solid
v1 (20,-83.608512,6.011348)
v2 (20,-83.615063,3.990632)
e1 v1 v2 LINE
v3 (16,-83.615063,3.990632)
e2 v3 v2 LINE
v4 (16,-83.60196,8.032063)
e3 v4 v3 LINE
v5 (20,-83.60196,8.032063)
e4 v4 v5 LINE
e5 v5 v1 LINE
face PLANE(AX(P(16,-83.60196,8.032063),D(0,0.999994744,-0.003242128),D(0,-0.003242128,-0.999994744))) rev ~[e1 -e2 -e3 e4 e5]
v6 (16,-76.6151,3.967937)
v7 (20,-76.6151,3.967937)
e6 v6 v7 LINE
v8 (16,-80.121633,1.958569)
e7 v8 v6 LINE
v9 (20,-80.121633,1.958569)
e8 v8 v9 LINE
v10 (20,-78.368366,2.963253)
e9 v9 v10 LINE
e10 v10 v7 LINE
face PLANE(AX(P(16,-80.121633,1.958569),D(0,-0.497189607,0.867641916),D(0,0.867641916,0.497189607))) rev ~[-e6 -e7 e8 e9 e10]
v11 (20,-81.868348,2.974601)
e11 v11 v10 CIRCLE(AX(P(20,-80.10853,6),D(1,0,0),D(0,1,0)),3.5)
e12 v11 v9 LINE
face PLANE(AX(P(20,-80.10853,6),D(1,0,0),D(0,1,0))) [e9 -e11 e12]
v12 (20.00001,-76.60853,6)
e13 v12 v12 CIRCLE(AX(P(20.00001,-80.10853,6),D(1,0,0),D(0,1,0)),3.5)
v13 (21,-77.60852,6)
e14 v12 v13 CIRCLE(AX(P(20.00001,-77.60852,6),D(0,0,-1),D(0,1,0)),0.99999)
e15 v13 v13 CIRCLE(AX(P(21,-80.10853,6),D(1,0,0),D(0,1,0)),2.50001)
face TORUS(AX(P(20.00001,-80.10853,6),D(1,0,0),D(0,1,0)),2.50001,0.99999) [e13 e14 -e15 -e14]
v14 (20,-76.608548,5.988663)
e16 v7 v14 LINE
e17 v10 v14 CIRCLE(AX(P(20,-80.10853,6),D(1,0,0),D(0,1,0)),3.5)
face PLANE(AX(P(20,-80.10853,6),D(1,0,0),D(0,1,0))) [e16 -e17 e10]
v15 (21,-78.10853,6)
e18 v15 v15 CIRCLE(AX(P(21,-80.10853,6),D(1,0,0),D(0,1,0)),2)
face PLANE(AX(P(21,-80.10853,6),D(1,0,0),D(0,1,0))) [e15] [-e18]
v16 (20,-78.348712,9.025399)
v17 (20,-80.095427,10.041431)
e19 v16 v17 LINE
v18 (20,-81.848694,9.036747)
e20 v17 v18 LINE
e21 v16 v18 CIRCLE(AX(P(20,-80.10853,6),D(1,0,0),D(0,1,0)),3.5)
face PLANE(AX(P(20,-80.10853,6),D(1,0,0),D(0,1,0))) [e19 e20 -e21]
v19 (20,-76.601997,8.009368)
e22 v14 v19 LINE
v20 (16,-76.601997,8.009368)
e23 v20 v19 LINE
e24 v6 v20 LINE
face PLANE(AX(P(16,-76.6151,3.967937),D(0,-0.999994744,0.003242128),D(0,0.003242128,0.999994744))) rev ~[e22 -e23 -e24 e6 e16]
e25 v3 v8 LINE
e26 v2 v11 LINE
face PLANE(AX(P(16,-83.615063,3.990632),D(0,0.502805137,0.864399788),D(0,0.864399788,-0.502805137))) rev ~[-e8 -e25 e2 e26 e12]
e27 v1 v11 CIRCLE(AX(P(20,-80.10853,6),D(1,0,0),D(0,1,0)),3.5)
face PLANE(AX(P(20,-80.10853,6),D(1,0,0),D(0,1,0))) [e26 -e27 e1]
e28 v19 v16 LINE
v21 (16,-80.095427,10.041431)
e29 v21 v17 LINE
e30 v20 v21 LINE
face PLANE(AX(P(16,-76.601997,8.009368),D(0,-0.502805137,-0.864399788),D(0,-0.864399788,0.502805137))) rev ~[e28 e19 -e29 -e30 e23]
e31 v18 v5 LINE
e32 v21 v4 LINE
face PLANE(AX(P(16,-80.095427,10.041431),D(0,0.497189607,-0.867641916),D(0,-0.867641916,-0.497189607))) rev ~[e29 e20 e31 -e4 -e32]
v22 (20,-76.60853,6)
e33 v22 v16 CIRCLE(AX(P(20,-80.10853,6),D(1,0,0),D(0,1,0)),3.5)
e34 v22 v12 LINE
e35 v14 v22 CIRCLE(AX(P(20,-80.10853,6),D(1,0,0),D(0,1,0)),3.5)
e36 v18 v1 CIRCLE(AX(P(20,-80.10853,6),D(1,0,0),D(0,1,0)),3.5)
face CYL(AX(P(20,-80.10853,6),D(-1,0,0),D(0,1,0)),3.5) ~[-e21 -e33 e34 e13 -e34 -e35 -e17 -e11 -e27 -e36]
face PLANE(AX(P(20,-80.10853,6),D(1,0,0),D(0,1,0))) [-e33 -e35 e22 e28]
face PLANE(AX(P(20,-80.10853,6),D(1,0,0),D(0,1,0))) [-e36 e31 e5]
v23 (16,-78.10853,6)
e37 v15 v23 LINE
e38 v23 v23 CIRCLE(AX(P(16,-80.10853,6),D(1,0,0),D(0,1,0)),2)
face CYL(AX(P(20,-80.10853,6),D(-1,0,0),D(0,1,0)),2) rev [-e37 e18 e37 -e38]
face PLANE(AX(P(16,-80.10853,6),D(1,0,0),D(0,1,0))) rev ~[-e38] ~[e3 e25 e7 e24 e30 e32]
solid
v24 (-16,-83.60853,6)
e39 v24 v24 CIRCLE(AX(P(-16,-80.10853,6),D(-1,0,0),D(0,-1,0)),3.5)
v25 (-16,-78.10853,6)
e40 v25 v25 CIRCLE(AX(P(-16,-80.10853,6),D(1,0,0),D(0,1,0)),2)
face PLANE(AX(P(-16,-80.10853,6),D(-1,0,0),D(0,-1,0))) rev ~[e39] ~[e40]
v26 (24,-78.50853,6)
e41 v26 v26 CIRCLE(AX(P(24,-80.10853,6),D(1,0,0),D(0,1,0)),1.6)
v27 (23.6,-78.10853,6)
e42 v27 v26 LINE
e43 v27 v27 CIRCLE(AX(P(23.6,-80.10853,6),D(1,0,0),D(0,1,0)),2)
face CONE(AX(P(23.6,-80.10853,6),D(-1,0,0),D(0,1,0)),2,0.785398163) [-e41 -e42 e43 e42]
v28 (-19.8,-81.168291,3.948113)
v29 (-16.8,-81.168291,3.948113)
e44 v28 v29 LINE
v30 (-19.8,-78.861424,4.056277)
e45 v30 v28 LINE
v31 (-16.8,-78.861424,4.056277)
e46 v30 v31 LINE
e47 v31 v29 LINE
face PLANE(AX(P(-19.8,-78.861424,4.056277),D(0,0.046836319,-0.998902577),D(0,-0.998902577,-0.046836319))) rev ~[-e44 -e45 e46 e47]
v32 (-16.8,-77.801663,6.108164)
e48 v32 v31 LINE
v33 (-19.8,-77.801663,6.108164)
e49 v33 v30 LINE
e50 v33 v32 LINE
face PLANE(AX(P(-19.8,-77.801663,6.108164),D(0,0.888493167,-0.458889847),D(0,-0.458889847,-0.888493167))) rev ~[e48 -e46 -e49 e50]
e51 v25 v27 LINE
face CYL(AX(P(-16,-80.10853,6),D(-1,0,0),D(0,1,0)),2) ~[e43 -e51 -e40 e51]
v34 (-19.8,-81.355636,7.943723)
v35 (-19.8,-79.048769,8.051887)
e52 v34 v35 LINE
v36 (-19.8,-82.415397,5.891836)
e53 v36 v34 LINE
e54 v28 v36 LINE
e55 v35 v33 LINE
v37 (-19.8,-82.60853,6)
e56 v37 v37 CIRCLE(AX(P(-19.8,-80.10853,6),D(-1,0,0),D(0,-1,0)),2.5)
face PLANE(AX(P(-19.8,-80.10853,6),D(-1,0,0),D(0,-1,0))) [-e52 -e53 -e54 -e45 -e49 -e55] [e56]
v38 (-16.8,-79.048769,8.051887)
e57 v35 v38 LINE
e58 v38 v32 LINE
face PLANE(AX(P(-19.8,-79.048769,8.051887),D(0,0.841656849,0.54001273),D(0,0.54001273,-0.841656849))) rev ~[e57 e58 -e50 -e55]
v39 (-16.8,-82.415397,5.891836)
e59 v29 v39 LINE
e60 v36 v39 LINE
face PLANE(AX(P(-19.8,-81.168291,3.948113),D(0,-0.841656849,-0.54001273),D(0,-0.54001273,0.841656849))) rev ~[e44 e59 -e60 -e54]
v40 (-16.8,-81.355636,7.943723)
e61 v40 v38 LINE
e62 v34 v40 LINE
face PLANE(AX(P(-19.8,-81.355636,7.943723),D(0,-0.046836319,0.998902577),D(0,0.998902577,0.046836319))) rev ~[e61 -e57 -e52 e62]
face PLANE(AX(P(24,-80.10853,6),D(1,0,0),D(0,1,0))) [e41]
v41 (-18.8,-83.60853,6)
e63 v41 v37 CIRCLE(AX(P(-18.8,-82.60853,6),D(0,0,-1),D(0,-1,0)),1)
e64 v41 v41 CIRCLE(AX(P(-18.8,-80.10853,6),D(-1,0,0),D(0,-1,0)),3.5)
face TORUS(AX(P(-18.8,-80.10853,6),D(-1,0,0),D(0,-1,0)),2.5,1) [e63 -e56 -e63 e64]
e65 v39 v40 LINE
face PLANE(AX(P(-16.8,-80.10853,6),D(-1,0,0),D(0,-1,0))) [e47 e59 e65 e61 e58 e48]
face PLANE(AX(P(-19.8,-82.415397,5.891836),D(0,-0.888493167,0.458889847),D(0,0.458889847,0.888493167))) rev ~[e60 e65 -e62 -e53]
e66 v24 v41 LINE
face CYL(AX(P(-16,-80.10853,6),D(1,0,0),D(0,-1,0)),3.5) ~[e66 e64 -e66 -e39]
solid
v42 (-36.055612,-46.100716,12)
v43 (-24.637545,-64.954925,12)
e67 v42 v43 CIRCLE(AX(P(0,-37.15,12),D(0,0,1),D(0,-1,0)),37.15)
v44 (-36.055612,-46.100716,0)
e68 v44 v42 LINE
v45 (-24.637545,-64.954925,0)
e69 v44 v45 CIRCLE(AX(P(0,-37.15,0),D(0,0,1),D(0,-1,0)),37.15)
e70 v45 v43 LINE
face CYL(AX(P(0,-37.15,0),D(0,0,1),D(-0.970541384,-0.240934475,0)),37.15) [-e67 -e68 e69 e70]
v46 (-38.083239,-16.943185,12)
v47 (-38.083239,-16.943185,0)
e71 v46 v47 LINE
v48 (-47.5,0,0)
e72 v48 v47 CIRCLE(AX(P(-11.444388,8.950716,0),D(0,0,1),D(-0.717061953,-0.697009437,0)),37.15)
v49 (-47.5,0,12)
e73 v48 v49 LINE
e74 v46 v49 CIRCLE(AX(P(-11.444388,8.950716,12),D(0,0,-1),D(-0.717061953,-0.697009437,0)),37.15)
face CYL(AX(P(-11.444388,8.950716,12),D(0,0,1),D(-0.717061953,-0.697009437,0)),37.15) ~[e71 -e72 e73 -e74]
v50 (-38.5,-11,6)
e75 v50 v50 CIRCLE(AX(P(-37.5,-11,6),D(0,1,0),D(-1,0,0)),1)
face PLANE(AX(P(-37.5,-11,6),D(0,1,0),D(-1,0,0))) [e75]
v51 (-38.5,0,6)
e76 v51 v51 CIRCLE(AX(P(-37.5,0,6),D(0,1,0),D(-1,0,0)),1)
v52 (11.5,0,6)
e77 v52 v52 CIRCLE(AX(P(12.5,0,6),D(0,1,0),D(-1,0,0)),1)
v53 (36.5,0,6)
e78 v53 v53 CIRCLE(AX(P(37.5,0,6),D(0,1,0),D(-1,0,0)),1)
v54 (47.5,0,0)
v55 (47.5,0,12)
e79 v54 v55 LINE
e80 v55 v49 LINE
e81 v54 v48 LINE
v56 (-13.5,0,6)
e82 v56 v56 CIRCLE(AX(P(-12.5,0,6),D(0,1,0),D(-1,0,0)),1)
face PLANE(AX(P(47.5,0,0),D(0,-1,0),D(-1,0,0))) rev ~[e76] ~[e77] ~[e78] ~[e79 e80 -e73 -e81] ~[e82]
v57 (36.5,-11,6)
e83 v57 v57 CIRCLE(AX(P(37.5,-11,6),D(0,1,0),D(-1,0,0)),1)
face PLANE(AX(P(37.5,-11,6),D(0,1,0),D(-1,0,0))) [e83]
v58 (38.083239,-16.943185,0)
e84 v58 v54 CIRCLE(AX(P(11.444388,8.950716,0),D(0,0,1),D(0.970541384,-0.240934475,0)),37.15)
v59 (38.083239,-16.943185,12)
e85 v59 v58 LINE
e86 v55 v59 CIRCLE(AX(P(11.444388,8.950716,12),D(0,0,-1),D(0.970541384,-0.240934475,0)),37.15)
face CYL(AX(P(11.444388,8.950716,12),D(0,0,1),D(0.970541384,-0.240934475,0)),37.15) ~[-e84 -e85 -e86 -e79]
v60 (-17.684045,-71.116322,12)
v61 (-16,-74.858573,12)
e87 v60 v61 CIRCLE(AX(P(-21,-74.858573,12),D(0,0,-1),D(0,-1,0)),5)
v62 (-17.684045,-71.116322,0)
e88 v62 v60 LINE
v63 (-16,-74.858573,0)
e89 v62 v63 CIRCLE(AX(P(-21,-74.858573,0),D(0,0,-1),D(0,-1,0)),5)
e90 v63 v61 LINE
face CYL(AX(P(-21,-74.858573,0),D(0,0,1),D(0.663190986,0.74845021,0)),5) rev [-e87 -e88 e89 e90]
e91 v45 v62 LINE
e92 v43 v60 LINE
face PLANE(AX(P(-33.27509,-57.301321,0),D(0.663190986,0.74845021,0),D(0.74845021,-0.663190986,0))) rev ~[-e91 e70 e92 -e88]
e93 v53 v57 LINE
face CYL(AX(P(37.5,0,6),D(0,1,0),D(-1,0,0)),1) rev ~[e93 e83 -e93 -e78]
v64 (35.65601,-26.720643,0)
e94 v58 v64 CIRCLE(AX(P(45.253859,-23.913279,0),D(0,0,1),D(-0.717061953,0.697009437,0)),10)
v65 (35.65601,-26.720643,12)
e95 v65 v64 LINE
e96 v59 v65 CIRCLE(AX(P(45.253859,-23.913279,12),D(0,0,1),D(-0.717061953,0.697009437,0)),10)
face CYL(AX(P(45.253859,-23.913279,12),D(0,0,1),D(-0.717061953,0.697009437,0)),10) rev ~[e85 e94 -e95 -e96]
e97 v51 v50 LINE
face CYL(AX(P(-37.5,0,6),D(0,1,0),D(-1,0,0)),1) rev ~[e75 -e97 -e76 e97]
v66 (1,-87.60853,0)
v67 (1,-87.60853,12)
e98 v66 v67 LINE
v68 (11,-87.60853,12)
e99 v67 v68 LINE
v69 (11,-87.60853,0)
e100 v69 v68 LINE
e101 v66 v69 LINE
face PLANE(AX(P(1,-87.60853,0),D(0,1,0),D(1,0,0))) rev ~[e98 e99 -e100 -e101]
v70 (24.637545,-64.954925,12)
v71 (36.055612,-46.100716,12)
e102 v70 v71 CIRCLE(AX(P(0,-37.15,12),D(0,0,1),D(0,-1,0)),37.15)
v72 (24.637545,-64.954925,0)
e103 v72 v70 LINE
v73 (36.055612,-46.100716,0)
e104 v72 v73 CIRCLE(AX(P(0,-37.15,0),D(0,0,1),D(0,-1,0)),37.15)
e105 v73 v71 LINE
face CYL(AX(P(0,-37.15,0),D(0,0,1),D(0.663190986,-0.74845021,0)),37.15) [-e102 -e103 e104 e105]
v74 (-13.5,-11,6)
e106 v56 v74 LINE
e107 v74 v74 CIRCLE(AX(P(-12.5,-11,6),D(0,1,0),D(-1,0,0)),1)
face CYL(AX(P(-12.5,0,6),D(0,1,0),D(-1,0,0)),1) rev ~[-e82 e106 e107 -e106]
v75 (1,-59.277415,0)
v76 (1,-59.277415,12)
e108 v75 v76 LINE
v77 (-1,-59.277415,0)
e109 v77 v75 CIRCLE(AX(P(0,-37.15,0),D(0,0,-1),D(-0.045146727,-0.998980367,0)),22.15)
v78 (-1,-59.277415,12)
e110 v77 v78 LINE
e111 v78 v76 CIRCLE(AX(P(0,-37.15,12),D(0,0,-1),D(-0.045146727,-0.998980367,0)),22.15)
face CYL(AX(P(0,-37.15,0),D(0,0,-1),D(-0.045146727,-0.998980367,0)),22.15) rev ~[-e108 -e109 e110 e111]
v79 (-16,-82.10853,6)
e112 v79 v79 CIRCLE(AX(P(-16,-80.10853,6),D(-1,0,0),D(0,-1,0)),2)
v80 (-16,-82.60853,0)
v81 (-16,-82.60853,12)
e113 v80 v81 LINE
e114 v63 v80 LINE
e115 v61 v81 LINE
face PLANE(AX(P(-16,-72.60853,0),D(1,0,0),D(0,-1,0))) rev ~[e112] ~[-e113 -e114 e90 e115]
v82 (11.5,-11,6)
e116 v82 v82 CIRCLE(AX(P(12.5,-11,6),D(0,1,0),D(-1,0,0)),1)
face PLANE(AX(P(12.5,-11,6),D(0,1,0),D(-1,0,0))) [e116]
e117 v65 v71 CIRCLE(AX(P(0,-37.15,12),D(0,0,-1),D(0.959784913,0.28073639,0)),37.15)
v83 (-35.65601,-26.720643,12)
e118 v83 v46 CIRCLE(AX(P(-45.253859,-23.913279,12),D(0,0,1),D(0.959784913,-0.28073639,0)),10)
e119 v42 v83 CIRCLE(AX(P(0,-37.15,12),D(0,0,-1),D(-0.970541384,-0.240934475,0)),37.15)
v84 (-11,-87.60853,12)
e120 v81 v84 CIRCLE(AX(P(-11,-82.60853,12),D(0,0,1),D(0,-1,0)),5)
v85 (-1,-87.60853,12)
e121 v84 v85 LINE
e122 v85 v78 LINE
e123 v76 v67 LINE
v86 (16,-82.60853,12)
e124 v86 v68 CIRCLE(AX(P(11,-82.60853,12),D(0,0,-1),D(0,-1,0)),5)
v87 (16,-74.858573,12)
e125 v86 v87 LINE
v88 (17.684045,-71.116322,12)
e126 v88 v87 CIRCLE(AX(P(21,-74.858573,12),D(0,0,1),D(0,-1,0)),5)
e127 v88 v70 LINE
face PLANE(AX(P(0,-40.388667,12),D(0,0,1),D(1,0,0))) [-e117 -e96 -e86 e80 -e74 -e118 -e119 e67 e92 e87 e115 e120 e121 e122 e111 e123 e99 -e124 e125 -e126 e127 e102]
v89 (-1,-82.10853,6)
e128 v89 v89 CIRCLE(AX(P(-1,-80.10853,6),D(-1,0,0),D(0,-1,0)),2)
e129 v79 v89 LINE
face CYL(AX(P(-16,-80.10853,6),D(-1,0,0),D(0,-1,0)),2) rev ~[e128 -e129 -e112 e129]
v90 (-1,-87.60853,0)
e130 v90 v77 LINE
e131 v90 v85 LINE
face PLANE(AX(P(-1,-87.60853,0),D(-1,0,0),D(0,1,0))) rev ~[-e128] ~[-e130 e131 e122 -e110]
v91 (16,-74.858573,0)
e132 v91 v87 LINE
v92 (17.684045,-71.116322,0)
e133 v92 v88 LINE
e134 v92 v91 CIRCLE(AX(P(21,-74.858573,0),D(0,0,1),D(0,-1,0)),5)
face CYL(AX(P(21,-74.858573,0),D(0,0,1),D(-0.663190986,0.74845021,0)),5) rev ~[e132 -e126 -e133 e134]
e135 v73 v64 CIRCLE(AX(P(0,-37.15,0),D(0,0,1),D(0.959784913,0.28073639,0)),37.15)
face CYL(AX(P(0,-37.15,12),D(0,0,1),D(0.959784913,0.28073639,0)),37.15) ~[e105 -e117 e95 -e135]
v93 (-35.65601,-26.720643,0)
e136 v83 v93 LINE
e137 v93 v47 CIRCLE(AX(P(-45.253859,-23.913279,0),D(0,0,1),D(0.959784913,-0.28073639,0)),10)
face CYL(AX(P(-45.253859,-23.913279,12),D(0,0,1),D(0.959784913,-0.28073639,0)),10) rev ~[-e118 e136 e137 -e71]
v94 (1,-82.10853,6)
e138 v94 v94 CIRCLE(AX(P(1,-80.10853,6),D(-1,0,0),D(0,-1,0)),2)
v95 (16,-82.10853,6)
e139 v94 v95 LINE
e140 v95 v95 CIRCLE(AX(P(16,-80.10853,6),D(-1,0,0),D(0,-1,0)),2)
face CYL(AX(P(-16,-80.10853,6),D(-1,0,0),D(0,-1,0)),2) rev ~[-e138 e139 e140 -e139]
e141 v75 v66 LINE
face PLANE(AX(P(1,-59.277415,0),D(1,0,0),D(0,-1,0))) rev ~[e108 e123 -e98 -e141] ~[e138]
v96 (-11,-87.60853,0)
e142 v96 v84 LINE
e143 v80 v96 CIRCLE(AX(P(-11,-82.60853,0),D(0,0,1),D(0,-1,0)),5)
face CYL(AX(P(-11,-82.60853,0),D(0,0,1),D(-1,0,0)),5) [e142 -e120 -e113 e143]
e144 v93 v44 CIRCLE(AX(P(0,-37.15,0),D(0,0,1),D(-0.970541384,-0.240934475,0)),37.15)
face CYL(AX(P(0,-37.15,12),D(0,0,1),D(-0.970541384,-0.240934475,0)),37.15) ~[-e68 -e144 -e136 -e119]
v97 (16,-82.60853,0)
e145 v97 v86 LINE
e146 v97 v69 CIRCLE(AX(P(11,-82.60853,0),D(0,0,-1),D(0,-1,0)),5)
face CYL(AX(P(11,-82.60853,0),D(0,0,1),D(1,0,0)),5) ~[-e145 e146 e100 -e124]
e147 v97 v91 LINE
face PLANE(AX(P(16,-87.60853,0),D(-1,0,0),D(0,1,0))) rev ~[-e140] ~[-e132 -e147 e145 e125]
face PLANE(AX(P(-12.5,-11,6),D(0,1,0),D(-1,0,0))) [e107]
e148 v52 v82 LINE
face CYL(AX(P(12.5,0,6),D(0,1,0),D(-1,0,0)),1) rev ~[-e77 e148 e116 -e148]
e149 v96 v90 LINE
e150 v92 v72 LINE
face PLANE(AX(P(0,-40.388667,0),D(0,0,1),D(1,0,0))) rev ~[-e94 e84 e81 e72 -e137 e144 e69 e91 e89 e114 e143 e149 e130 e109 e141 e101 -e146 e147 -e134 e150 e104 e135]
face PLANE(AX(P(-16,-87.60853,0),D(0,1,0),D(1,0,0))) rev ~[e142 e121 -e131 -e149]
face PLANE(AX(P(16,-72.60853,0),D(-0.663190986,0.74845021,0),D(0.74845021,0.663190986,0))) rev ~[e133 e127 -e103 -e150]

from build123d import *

# Parameters (mm, degrees)
F1_DEPTH  = 12
F2_R      = 37.15
F3_R      = 2
F4_DEPTH  = 63.501
F5_R      = 5
F6_R      = 3.5
F7_DEPTH  = 3.8
F8_R      = 2
F9_DEPTH  = 40
F10_R     = 2
F11_DEPTH = 4
F12_R     = 3.5
F12_R_2   = 2
F13_DEPTH = 1
F14_R     = 0.99999
F15_SIZE  = 0.4
F17_DEPTH = 3
F18_R     = 1
F20_DEPTH = 12.001
F21_R     = 1
F22_DEPTH = 11


# Not quite as in the source:
# - a fillet or chamfer is up to 0.001 mm smaller than in the source, because OpenCascade refuses the exact size


with BuildPart() as f1:
    # F0 (on Top) → F1 (new body)
    with BuildSketch(Plane.XY):
        with BuildLine():
            Line((47.5, 0), (-47.5, 0))
            Line((-47.5, 0), (-33.2750902547, -57.3013205481))
            Line((-33.2750902547, -57.3013205481), (-16, -72.6085300216))
            Line((-16, -72.6085300216), (-16, -87.6085300216))
            Line((-16, -87.6085300216), (-1, -87.6085300216))
            Line((-1, -87.6085300216), (-1, -59.2774151224))
            ThreePointArc((-1, -59.2774151224), (0, -15), (1, -59.2774151224))
            Line((1, -59.2774151224), (1, -87.6085300216))
            Line((1, -87.6085300216), (16, -87.6085300216))
            Line((16, -87.6085300216), (16, -72.6085300216))
            Line((16, -72.6085300216), (33.2750902547, -57.3013205481))
            Line((33.2750902547, -57.3013205481), (47.5, 0))
        make_face()
    extrude(amount=F1_DEPTH)

    # F2
    f2_edges = [f1.edges().sort_by_distance(p)[0] for p in [
        (-33.27509, -57.301321, 6),
        (33.27509, -57.301321, 6),
    ]]
    fillet(f2_edges, radius=F2_R)

    # F3 (on face) → F4 (cut, through all)
    with BuildSketch(Plane(origin=(-16, 0, 0), x_dir=(0, -1, 0), z_dir=(-1, 0, 0))):
        with Locations((80.1085300216, 6)):
            Circle(F3_R)
    extrude(amount=-F4_DEPTH, mode=Mode.SUBTRACT)

    # F5
    f5_edges = [f1.edges().sort_by_distance(p)[0] for p in [
        (-16, -72.60853, 6),
        (-16, -87.60853, 6),
        (16, -87.60853, 6),
        (16, -72.60853, 6),
    ]]
    fillet(f5_edges, radius=F5_R)

    # F19 (on face) → F20 (cut, through all)
    with BuildSketch(Plane.XY.offset(12)):
        with BuildLine():
            ThreePointArc((-38.0832391228, -16.9431848421), (-43.9161727331, -9.0966017337), (-47.5, 0))
            Line((-47.5, 0), (-36.0556124269, -46.1007157545))
            ThreePointArc((-36.0556124269, -46.1007157545), (-37.142105278, -36.3841569879), (-35.6560095209, -26.7206431146))
            ThreePointArc((-35.6560095209, -26.7206431146), (-35.5484448087, -21.5039344632), (-38.0832391228, -16.9431848421))
        make_face()
        with BuildLine():
            ThreePointArc((38.0832391228, -16.9431848421), (35.5484448087, -21.5039344632), (35.6560095209, -26.7206431146))
            ThreePointArc((35.6560095209, -26.7206431146), (37.142105278, -36.3841569879), (36.0556124269, -46.1007157545))
            Line((36.0556124269, -46.1007157545), (47.5, 0))
            ThreePointArc((47.5, 0), (43.9161727331, -9.0966017337), (38.0832391228, -16.9431848421))
        make_face()
    extrude(amount=-F20_DEPTH, mode=Mode.SUBTRACT)

    # F21 (on face) → F22 (cut)
    with BuildSketch(Plane(origin=(0, 0, 0), x_dir=(-1, 0, 0), z_dir=(0, 1, 0))):
        with Locations((-37.5, 6)):
            Circle(F21_R)
        with Locations((-12.5, 6)):
            Circle(F21_R)
        with Locations((12.5, 6)):
            Circle(F21_R)
        with Locations((37.5, 6)):
            Circle(F21_R)
    extrude(amount=-F22_DEPTH, mode=Mode.SUBTRACT)


with BuildPart() as f7:
    # F6 (on face) → F7 (new body)
    with BuildSketch(Plane(origin=(-16, 0, 0), x_dir=(0, -1, 0), z_dir=(-1, 0, 0))):
        with Locations((80.1085300216, 6)):
            Circle(F6_R)
    extrude(amount=F7_DEPTH)

    # F8 (on face) → F9 (join)
    with BuildSketch(Plane.YZ.offset(-16)):
        with Locations((-80.1085300216, 6)):
            Circle(F8_R)
    extrude(amount=F9_DEPTH)

    # F15
    f15_edges = [f7.edges().sort_by_distance(p)[0] for p in [
        (24, -82.10853, 6),
    ]]
    chamfer(f15_edges, length=F15_SIZE)

    # F16 (on face) → F17 (cut)
    with BuildSketch(Plane(origin=(-19.8, 0, 0), x_dir=(0, -1, 0), z_dir=(-1, 0, 0))):
        Polygon((81.1682907283, 3.9481129227), (82.4153967096, 5.8918361553), (81.3556360029, 7.9437232326), (79.0487693149, 8.0518870773), (77.8016633336, 6.1081638447), (78.8614240404, 4.0562767674), align=None)
    extrude(amount=-F17_DEPTH, mode=Mode.SUBTRACT)

    # F18
    f18_edges = [f7.edges().sort_by_distance(p)[0] for p in [
        (-19.8, -76.60853, 6),
    ]]
    fillet(f18_edges, radius=F18_R)


with BuildPart() as f11:
    # F10 (on face) → F11 (new body)
    with BuildSketch(Plane.YZ.offset(16)):
        Polygon((-83.6150630784, 3.9906321255), (-80.1216329251, 1.9585693564), (-76.6150998683, 3.9679372309), (-76.6019969649, 8.0093678745), (-80.0954271181, 10.0414306436), (-83.6019601749, 8.0320627691), align=None)
        with Locations((-80.1085300216, 6)):
            Circle(F10_R, mode=Mode.SUBTRACT)
    extrude(amount=F11_DEPTH)

    # F12 (on face) → F13 (join)
    with BuildSketch(Plane.YZ.offset(20)):
        with Locations((-80.1085300216, 6)):
            Circle(F12_R)
        with Locations((-80.1085300216, 6)):
            Circle(F12_R_2, mode=Mode.SUBTRACT)
    extrude(amount=F13_DEPTH)

    # F14 (radius 1 in the source; OpenCascade refuses exactly that, so slightly less here)
    f14_edges = [f11.edges().sort_by_distance(p)[0] for p in [
        (21, -83.60853, 6),
    ]]
    fillet(f14_edges, radius=F14_R)


solid = Compound([f1.part, f7.part, f11.part])
